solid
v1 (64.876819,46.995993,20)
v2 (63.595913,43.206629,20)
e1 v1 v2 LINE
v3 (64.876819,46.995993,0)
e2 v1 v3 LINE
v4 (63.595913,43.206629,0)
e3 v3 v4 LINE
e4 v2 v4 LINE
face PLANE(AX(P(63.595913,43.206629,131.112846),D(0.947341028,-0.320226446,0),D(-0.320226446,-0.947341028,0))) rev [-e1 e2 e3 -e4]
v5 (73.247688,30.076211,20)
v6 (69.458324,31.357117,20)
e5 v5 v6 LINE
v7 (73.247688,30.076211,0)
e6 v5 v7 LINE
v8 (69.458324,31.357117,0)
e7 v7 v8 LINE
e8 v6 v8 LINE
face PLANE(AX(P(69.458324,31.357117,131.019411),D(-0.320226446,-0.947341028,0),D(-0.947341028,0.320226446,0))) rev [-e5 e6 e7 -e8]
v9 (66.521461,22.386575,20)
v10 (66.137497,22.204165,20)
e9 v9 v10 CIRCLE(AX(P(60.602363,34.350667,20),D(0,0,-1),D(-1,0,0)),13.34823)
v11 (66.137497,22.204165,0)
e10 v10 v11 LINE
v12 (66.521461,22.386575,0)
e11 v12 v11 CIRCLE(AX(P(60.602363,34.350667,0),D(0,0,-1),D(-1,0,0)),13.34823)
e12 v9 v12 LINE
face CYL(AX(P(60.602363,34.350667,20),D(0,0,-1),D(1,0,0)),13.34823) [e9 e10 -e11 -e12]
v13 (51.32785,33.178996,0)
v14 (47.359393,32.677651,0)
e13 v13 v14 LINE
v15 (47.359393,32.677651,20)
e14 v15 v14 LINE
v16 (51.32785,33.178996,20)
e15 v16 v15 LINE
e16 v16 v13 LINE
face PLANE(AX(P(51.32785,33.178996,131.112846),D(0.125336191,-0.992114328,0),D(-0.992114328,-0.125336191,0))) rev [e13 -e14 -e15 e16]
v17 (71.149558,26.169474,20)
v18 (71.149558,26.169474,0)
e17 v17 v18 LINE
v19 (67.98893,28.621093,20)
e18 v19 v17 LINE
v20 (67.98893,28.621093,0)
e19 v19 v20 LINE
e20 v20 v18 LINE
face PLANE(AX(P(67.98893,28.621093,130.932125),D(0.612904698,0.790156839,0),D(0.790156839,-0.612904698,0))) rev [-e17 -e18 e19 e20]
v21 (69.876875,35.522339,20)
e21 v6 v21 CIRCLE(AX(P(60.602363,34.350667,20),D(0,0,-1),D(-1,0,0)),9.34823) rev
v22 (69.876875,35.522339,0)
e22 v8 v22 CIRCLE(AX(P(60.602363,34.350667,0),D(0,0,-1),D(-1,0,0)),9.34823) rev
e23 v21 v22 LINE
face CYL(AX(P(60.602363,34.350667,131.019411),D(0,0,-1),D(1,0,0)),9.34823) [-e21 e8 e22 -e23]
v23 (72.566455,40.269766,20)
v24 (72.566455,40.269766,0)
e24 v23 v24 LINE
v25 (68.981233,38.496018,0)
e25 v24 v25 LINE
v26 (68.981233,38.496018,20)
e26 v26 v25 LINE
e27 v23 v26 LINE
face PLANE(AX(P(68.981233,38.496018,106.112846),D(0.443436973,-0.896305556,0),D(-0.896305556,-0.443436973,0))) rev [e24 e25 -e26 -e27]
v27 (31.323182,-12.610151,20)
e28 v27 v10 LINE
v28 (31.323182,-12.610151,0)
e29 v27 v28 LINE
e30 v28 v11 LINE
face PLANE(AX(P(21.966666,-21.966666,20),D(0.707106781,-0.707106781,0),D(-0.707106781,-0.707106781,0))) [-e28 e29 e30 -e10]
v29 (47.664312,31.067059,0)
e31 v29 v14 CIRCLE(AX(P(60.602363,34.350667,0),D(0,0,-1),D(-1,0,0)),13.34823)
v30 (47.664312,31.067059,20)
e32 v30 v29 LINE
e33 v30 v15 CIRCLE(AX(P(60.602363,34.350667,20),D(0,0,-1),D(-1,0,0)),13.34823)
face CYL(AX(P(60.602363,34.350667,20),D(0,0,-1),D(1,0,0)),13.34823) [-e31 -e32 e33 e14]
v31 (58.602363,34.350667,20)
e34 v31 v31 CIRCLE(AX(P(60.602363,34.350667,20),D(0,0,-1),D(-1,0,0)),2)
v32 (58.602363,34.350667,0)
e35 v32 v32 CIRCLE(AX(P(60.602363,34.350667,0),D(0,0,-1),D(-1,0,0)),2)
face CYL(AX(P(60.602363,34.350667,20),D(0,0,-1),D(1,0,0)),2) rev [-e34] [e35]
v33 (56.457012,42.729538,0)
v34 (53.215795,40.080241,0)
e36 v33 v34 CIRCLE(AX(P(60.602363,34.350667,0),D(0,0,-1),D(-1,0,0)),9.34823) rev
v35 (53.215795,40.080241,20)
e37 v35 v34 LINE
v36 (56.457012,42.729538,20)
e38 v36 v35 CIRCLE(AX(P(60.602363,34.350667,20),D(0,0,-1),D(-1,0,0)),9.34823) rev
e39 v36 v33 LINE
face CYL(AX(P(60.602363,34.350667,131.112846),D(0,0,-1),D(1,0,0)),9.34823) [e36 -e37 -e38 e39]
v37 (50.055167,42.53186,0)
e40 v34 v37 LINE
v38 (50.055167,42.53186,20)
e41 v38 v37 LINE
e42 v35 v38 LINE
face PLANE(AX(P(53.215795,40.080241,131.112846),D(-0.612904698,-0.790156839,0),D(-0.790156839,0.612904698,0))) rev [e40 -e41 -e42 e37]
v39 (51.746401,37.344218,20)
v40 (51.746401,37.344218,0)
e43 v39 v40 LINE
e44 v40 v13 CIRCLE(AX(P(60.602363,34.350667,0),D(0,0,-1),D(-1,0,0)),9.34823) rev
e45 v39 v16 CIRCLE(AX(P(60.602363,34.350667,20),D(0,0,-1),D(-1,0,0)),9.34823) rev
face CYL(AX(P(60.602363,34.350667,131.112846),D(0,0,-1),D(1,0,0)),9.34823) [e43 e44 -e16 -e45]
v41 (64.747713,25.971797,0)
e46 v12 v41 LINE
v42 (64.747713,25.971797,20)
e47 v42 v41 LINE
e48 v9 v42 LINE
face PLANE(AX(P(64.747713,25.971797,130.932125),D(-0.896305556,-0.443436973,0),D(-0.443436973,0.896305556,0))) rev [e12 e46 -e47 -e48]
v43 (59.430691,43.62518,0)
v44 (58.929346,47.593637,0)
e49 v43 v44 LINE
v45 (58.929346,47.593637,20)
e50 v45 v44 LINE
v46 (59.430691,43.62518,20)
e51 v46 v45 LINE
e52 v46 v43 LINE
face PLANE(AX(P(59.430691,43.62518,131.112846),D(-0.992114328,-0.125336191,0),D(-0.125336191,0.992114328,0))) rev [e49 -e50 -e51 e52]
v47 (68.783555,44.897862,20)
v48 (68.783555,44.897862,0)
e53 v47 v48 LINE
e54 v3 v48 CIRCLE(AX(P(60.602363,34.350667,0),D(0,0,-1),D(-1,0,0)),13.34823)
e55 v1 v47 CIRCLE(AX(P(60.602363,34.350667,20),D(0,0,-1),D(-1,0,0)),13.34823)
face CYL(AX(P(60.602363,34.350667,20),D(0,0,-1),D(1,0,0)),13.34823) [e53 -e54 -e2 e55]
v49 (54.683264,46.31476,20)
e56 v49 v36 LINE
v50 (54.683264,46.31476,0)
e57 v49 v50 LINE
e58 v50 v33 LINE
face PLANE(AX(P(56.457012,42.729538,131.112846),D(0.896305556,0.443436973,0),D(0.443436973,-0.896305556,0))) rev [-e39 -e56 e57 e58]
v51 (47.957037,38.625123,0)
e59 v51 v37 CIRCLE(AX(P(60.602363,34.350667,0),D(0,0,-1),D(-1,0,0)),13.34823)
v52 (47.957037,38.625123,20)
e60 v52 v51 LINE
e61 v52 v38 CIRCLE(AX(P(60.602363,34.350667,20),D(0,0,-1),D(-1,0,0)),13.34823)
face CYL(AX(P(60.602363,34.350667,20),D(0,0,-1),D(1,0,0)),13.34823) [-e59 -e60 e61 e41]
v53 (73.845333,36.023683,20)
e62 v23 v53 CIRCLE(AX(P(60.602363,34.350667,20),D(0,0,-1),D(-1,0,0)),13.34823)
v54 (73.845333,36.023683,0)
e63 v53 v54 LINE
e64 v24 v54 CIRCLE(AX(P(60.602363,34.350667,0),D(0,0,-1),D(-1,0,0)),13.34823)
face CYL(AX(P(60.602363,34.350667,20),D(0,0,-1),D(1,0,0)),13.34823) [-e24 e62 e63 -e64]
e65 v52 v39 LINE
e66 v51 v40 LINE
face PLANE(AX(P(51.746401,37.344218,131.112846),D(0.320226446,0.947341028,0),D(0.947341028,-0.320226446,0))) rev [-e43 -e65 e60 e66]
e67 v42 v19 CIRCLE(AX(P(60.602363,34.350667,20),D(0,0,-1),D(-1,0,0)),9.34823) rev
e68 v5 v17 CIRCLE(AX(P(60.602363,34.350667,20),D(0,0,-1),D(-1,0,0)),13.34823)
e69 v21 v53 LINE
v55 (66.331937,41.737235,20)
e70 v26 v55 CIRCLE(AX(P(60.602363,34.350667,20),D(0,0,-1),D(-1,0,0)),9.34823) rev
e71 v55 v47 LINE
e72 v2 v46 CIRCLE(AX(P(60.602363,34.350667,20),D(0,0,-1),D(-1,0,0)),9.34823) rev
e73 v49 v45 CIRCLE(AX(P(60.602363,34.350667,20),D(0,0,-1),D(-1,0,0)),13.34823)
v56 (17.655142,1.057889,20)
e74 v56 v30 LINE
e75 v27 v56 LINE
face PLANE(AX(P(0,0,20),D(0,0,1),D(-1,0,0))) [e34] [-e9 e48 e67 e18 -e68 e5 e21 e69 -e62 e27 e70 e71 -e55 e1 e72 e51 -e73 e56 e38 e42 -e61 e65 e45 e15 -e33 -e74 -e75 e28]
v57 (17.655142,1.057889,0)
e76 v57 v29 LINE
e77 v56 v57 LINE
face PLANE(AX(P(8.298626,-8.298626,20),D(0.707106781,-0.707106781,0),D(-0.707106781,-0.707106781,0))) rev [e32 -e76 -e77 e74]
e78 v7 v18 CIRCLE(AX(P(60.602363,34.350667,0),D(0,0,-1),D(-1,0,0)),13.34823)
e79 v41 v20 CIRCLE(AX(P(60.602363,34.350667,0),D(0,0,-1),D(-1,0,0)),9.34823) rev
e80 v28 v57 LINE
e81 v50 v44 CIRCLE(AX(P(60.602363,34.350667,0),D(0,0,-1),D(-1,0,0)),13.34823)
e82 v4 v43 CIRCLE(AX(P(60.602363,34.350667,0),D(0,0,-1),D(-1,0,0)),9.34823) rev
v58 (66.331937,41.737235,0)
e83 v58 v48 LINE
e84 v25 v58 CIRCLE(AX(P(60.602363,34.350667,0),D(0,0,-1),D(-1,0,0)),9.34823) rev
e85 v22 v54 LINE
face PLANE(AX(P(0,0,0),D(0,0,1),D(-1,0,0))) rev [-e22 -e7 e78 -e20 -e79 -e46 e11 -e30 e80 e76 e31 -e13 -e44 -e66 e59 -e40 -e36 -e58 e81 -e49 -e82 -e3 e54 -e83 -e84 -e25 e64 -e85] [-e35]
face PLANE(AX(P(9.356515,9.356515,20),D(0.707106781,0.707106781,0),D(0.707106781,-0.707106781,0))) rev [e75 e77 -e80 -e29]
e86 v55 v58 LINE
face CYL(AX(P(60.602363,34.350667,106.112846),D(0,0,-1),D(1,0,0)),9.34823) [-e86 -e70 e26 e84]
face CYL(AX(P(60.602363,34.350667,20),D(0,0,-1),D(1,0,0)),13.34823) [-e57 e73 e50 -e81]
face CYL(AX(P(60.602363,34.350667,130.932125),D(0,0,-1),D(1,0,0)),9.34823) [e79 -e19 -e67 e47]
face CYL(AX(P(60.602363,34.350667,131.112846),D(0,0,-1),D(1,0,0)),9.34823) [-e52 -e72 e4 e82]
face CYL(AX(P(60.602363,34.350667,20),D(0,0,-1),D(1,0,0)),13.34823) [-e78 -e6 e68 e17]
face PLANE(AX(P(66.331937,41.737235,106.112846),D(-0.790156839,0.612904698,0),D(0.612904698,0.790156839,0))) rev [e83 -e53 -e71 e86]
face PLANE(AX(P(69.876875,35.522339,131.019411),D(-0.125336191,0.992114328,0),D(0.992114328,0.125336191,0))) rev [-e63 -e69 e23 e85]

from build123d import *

# Parameters (mm, degrees)
SKETCH1_R           = 13.348229866
SKETCH1_R_2         = 2
BOSS_EXTRUDE1_DEPTH = 20
CUT_EXTRUDE4_DEPTH  = 91.243420293
CIRPATTERN7_COUNT   = 4
CIRPATTERN7_ANGLE   = 135
CIRPATTERN9_DEPTH   = 20


# Read off the part's stored shape, not the designer's step: CirPattern9
with BuildPart() as part:
    # Sketch1 → Boss-Extrude1 (new body)
    # profile 1 of 2: a face of its own
    with BuildSketch(Plane.XY):
        with Locations((-60.602362619, 34.350667158)):
            Circle(SKETCH1_R)
        with Locations((-60.602362619, 34.350667158)):
            Circle(SKETCH1_R_2, mode=Mode.SUBTRACT)
    # profile 2 of 2: a face of its own
    with BuildSketch(Plane.XY):
        with BuildLine():
            Line((-66.137497339, 22.204164608), (-31.323181793, -12.610150938))
            Line((-31.323181793, -12.610150938), (-17.655141573, 1.057889282))
            Line((-17.655141573, 1.057889282), (-47.664311726, 31.067059435))
            ThreePointArc((-47.664311726, 31.067059435), (-54.828410927, 22.315854221), (-66.137497339, 22.204164608))
        make_face()
    extrude(amount=BOSS_EXTRUDE1_DEPTH)

    # Sketch2 → Cut-Extrude4 (cut, symmetric)
    with BuildSketch(Plane.XY):
        with BuildLine():
            Line((-169.23850632, 174.404401772), (-68.783555417, 44.897862281))
            Line((-68.783555417, 44.897862281), (-66.331936624, 41.737234923))
            ThreePointArc((-66.331936624, 41.737234923), (-67.840347325, 40.266829683), (-68.981232991, 38.496017917))
            Line((-68.981232991, 38.496017917), (-72.566455217, 40.269765811))
            Line((-72.566455217, 40.269765811), (-219.470747071, 112.948992325))
            Line((-219.470747071, 112.948992325), (-473.273699138, 320.401698382))
            Line((-473.273699138, 320.401698382), (-423.041458386, 381.857107829))
            Line((-423.041458386, 381.857107829), (-169.23850632, 174.404401772))
        make_face()
    cut_extrude4 = extrude(amount=CUT_EXTRUDE4_DEPTH, both=True, mode=Mode.SUBTRACT)

    # CirPattern7: Cut-Extrude4 ×4 about axis
    cirpattern7_axis = Axis((-60.602362619, 34.350667158, 20), (0, 0, -1))
    for i in range(1, CIRPATTERN7_COUNT):
        add(cut_extrude4.rotate(cirpattern7_axis, i * CIRPATTERN7_ANGLE / (CIRPATTERN7_COUNT - 1)), mode=Mode.SUBTRACT)

    # CirPattern9 outline → CirPattern9 (cut)
    with BuildSketch(Plane.XY):
        with BuildLine():
            Line((-73.247688421, 30.076210947), (-69.45832431, 31.357116731))
            ThreePointArc((-69.45832431, 31.357116731), (-69.903749327, 33.41599773), (-69.876875408, 35.522338682))
            Line((-69.876875408, 35.522338682), (-73.845332718, 36.023683446))
            ThreePointArc((-73.845332718, 36.023683446), (-73.883705678, 33.016063436), (-73.247688421, 30.076210947))
        make_face()
        with BuildLine():
            Line((-67.988930384, 28.621093153), (-71.149557741, 26.16947436))
            ThreePointArc((-71.149557741, 26.16947436), (-69.049983017, 24.015632075), (-66.521461271, 22.386574559))
            Line((-66.521461271, 22.386574559), (-64.747713378, 25.971796785))
            ThreePointArc((-64.747713378, 25.971796785), (-66.518525144, 27.112682451), (-67.988930384, 28.621093153))
        make_face()
    extrude(amount=CIRPATTERN9_DEPTH, mode=Mode.SUBTRACT)


with BuildPart() as body_2:
    # Mirror2: mirrored copy
    add(part.part.mirror(Plane(origin=(0, 0, 0), x_dir=(0, 0, 1), z_dir=(1, 0, 0))))


solid = body_2.part
